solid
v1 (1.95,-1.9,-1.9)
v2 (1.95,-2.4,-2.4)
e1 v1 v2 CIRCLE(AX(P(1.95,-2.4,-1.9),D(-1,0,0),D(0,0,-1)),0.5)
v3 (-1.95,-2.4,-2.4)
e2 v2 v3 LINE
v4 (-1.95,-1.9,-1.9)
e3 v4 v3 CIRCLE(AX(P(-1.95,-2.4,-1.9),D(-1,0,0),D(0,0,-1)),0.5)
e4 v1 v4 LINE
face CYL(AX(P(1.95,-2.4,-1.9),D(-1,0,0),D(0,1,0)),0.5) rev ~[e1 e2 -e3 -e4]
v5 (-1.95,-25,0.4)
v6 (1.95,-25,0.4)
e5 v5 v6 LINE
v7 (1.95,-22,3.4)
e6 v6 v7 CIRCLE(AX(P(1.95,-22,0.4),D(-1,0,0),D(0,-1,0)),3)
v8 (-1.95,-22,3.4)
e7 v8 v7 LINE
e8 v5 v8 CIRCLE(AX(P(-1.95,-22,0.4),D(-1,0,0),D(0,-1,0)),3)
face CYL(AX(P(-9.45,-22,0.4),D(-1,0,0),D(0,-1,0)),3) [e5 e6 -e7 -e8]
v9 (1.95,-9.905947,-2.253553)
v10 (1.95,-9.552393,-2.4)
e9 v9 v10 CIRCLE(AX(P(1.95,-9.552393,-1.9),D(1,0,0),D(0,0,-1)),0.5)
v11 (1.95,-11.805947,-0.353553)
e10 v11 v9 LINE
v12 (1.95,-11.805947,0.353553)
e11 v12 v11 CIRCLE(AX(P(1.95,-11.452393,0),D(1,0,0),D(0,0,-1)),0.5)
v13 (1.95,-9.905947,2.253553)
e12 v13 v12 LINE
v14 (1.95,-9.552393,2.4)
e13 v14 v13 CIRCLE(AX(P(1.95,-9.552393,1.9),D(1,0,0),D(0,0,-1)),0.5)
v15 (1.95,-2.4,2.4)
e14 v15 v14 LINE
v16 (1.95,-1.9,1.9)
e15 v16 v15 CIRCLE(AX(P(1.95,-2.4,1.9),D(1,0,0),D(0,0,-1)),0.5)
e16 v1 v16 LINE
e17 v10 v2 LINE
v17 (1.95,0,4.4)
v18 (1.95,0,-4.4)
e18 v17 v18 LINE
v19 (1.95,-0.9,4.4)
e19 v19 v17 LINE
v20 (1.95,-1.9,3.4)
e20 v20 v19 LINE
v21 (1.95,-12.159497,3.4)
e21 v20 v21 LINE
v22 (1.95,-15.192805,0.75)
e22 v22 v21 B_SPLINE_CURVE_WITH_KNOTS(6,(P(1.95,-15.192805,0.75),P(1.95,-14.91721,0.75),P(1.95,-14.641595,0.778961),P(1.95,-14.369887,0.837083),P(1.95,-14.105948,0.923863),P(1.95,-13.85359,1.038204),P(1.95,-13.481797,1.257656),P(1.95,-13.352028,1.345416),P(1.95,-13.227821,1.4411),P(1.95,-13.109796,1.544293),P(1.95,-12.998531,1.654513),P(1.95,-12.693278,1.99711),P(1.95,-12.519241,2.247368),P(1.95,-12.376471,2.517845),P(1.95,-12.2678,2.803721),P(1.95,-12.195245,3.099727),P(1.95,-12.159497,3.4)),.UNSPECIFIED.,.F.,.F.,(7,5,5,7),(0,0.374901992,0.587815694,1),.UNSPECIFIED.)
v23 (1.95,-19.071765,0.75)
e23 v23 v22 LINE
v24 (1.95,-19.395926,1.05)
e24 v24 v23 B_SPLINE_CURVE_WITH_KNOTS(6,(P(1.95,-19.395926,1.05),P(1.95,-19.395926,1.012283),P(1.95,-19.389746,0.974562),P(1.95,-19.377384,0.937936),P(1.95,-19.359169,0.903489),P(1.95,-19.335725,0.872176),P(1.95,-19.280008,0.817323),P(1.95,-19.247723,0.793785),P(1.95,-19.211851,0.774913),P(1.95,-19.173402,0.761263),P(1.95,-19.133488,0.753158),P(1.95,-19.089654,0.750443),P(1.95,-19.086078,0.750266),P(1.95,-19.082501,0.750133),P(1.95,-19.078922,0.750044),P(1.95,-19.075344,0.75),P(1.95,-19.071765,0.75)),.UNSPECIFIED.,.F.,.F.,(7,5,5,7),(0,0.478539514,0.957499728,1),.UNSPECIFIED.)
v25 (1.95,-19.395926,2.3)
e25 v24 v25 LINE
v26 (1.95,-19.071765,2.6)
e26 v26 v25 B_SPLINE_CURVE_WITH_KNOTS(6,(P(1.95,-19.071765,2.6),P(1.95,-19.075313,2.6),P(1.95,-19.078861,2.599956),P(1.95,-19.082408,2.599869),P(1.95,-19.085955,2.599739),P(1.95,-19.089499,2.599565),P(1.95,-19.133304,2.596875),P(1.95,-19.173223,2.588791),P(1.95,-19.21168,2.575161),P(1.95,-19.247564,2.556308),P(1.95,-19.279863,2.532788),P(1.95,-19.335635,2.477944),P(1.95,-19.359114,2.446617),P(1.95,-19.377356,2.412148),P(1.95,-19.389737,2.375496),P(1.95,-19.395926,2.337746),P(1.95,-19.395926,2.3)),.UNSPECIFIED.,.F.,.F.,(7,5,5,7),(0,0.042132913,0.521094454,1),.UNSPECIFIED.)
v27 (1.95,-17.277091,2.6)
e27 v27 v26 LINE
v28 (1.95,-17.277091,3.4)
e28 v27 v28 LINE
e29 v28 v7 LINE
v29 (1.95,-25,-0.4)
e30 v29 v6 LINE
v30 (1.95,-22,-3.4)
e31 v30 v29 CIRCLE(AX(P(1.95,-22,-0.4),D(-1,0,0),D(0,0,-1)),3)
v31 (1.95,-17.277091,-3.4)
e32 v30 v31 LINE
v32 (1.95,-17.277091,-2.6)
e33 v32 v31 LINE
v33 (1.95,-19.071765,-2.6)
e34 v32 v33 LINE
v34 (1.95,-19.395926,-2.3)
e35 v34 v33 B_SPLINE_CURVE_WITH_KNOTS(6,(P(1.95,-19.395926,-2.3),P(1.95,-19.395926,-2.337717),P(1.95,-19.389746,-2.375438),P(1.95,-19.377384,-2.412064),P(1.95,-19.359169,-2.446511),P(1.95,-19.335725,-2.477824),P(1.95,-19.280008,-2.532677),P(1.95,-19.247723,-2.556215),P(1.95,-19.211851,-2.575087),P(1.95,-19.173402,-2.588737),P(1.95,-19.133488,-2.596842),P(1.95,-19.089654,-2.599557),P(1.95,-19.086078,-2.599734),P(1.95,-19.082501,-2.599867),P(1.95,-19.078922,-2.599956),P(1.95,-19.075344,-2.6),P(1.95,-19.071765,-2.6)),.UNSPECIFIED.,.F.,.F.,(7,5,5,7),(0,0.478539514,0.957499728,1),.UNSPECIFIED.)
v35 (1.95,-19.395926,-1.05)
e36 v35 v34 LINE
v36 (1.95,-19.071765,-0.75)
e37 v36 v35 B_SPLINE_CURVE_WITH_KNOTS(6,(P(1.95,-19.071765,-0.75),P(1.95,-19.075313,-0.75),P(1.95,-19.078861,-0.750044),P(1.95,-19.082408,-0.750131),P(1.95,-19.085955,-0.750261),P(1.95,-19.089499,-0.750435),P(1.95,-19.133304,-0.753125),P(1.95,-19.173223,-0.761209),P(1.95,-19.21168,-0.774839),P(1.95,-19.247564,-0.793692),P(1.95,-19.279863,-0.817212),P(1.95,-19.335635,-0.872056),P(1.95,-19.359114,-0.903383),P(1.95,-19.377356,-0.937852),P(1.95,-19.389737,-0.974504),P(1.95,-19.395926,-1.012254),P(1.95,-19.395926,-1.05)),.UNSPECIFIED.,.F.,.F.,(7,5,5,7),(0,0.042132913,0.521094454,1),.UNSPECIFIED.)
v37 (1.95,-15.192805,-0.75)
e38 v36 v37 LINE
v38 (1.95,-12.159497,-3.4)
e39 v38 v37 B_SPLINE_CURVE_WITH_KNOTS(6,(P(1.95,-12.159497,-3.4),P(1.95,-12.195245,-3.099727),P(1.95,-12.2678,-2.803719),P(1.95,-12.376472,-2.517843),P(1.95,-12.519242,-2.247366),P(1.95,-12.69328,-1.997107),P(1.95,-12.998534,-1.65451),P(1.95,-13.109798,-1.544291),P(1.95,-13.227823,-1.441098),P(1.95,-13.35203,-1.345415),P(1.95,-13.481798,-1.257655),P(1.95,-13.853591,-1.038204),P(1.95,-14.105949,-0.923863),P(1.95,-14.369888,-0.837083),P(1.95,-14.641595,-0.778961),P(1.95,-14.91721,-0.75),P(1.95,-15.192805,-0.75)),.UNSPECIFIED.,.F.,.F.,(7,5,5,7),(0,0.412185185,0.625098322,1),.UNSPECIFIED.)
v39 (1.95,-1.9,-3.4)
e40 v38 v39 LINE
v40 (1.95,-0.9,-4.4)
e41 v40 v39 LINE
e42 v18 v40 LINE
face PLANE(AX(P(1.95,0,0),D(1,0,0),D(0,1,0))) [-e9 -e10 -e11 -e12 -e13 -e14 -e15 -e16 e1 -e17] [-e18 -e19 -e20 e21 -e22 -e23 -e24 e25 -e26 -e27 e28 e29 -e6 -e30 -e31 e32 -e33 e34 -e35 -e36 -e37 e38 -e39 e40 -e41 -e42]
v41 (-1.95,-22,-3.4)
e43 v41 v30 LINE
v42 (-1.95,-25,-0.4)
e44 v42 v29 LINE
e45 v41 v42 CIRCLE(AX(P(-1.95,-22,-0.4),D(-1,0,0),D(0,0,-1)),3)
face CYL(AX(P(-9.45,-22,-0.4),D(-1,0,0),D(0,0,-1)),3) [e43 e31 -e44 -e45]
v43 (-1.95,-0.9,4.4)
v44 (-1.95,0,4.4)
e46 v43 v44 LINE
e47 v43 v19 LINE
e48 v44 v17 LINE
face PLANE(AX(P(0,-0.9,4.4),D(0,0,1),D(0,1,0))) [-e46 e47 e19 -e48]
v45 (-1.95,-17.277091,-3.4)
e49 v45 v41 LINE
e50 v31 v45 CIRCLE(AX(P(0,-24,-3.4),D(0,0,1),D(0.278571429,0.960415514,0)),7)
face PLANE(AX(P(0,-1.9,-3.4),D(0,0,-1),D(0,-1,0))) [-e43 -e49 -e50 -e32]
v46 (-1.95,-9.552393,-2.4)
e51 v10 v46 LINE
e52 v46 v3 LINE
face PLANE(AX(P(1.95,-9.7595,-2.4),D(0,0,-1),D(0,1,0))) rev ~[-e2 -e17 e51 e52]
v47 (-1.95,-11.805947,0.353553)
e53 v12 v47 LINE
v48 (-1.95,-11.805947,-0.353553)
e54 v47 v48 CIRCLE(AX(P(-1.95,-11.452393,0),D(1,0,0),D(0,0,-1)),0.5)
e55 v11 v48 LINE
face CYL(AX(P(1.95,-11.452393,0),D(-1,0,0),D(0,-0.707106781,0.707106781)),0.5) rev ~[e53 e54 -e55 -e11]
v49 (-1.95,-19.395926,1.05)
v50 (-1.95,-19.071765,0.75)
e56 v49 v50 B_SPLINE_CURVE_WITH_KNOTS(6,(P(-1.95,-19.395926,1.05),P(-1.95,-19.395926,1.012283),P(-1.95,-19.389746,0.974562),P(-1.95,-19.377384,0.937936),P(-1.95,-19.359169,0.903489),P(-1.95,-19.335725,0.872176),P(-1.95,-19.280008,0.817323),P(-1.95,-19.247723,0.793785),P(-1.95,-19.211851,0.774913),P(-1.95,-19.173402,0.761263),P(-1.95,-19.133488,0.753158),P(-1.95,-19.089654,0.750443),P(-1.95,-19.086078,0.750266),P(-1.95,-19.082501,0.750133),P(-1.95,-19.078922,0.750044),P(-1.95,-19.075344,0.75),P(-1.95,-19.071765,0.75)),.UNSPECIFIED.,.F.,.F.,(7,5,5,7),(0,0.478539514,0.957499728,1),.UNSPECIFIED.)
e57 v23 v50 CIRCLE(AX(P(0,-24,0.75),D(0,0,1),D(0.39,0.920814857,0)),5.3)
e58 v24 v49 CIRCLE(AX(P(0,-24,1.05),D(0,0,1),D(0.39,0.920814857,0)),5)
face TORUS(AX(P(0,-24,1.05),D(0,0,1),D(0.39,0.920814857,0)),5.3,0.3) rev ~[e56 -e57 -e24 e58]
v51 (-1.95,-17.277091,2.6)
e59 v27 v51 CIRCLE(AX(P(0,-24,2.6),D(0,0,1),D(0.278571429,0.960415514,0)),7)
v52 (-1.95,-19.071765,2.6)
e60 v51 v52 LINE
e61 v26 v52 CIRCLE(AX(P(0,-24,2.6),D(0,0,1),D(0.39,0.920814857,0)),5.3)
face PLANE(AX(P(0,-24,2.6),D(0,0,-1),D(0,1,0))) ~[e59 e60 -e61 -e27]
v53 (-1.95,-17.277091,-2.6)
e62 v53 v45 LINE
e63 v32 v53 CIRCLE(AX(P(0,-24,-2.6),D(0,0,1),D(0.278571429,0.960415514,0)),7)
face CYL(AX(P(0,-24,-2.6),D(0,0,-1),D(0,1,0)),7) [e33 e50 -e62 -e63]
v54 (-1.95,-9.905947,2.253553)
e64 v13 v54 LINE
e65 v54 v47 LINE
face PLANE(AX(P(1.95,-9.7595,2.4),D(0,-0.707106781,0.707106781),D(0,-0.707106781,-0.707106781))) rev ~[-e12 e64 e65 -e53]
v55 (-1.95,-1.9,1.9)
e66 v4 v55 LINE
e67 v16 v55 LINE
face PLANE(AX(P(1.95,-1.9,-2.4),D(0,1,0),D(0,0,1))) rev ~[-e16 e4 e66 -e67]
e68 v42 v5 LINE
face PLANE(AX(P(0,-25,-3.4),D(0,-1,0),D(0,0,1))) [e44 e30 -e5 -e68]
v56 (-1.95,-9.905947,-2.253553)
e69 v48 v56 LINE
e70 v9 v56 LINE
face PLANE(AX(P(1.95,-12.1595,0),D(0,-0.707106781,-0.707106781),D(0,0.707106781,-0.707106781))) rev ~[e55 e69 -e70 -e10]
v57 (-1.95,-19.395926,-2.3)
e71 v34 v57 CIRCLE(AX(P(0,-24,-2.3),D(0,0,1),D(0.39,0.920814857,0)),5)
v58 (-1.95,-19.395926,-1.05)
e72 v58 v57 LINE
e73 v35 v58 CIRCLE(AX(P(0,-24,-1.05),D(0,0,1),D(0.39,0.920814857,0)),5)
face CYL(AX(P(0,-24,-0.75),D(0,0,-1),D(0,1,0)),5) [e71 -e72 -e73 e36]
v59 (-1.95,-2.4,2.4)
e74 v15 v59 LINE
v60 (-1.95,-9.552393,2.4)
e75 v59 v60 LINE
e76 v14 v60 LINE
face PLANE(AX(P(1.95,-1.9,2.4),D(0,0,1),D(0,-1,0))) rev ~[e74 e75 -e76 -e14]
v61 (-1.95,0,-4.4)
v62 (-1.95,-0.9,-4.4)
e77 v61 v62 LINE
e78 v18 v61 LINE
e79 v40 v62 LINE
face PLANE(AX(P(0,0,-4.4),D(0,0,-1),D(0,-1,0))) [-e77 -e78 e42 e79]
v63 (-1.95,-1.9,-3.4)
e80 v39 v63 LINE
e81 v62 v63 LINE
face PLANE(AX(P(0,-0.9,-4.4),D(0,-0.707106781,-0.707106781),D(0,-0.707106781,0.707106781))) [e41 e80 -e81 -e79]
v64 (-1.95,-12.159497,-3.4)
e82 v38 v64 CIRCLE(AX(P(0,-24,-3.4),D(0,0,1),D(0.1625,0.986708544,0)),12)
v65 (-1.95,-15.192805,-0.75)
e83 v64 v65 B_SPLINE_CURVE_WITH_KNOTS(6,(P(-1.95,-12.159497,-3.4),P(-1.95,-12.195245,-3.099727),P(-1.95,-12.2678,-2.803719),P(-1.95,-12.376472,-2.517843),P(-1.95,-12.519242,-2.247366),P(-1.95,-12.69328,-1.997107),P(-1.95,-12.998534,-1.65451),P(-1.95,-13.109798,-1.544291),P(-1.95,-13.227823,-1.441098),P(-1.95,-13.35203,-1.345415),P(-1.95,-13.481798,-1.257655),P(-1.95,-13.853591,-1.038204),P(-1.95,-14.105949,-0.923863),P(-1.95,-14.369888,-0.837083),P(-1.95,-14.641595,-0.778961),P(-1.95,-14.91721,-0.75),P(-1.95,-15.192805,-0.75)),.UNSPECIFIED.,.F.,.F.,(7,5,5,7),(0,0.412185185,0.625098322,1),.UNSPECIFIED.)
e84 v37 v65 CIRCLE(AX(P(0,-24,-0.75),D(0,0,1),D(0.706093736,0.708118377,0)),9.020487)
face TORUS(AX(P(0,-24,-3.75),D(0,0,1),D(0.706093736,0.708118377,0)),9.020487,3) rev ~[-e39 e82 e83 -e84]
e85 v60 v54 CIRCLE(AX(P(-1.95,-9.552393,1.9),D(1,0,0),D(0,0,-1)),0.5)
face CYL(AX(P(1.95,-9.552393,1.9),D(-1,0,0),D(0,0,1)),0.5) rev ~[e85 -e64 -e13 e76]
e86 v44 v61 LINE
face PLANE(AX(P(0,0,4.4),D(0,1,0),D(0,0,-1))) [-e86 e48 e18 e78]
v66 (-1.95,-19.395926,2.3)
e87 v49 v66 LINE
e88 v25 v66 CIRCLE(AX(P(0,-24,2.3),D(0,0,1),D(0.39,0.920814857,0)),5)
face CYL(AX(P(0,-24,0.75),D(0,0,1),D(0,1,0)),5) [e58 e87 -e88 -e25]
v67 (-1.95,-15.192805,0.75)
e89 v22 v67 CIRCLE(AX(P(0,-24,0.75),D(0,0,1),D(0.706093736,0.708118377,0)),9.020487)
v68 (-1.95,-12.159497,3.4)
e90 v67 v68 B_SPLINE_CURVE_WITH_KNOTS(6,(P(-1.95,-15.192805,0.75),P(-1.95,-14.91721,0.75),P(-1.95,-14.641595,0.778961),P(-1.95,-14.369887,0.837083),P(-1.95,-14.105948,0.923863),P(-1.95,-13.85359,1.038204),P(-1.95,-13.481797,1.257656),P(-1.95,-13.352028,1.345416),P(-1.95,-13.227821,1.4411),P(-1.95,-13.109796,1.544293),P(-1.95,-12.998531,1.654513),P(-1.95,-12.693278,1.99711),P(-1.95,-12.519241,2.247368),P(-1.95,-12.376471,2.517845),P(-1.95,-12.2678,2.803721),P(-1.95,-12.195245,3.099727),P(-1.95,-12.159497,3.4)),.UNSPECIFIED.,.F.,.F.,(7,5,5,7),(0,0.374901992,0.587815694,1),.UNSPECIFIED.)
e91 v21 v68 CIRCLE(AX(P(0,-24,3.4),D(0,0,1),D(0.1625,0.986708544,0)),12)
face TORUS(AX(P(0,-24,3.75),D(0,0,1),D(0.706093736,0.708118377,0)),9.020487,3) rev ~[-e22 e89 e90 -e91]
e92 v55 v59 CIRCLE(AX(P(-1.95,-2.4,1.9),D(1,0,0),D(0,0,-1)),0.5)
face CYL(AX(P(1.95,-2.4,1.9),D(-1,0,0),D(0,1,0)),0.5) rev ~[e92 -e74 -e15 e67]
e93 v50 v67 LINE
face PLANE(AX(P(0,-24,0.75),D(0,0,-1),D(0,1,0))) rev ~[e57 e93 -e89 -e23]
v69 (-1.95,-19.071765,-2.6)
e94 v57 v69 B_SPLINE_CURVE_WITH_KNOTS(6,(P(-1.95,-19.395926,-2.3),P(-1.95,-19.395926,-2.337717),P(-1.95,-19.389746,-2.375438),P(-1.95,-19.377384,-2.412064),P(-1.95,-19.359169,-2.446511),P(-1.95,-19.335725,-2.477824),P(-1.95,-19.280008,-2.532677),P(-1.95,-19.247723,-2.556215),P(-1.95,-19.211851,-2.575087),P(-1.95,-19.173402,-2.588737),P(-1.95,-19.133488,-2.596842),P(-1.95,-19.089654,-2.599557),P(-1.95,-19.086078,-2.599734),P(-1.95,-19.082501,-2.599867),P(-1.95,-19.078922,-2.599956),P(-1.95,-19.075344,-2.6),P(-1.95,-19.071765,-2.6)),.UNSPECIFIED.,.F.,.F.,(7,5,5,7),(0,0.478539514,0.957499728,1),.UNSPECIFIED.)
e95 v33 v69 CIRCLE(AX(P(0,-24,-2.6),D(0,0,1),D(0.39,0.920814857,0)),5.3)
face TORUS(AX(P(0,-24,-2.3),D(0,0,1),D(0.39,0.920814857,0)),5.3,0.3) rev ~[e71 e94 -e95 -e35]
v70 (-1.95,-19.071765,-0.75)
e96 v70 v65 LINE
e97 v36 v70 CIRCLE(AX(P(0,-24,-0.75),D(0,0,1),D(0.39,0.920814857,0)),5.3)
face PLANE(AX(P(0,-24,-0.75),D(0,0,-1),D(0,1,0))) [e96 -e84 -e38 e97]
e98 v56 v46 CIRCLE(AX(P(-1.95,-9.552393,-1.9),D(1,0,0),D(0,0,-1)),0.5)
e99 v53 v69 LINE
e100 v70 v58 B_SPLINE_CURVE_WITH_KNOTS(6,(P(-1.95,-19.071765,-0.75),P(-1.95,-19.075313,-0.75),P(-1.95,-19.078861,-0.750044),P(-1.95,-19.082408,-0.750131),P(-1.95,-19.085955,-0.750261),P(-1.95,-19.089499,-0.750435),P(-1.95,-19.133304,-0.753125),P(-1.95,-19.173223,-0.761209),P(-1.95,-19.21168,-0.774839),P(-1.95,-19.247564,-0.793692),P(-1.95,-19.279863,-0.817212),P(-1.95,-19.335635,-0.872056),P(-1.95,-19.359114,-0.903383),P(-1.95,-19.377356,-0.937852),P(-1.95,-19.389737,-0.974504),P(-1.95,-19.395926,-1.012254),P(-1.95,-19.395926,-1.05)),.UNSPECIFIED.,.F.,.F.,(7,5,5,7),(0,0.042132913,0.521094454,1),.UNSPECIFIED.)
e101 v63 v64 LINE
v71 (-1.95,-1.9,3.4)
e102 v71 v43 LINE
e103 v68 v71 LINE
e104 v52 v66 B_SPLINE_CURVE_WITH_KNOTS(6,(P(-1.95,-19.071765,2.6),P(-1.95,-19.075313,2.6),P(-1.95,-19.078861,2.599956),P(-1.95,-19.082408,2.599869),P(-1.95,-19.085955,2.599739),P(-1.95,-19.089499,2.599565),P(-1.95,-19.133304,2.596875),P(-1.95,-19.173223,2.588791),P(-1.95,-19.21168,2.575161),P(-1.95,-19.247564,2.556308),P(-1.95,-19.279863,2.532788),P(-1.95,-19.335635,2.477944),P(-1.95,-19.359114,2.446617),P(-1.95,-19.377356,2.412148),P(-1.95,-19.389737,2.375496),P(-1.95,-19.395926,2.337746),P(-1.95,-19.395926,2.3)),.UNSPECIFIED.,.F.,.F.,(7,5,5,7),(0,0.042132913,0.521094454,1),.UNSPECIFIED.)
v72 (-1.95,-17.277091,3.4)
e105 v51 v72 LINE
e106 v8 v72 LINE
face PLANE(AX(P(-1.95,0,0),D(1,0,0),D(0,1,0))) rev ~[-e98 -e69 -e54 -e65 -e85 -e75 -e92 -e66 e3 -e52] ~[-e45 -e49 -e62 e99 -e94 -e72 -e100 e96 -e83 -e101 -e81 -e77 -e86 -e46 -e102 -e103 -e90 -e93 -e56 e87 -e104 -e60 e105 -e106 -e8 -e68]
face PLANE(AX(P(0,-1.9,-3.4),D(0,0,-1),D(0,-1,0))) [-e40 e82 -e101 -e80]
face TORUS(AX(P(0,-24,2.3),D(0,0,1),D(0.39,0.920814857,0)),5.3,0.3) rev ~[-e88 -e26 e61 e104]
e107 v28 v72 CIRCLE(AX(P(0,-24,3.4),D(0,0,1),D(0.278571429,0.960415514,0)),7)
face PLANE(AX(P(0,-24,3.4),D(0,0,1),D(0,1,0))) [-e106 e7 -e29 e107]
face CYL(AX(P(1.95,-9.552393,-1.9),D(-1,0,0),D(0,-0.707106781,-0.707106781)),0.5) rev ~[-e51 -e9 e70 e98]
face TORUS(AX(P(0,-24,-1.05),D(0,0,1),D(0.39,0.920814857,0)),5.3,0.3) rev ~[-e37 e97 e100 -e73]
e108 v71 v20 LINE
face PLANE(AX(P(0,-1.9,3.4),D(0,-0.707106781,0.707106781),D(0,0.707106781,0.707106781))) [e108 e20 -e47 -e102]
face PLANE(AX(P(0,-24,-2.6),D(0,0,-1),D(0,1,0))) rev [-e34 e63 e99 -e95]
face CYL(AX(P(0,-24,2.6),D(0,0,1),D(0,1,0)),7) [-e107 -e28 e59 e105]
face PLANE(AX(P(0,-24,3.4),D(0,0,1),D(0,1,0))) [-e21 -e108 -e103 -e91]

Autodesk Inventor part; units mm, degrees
ref_plane "YZ Plane" through (0, 0, 0) normal (1, 0, 0) x (0, 1, 0)
ref_plane "XZ Plane" through (0, 0, 0) normal (0, 1, 0) x (-1, 0, 0)
ref_plane "XY Plane" through (0, 0, 0) normal (0, 0, 1) x (1, 0, 0)
sketch "Sketch1" plane through (0, 0, 0) normal (1, 0, 0) x (0, 1, 0)
  line L0 (0, 4.4) -> (0, -4.4)
  line L1 (0, -4.4) -> (-0.9, -4.4)
  line L2 (-0.9, -4.4) -> (-1.9, -3.4)
  line L3 (-1.9, -3.4) -> (-1.9, -3.4)
  line L4 (-1.9, -3.4) -> (-25, -3.4)
  line L5 (-25, -3.4) -> (-25, 3.4)
  line L6 (-25, 3.4) -> (-1.9, 3.4)
  line L7 (-1.9, 3.4) -> (-1.9, 3.4)
  line L8 (-1.9, 3.4) -> (-0.9, 4.4)
  line L9 (-0.9, 4.4) -> (0, 4.4)
  line L10 (0, 0) -> (-25, 0) construction
  line L11 (-24, 3.4) -> (-24, -3.4)
  line L12 (-12, 3.4) -> (-12, 0.75)
  line L13 (-12, 0.75) -> (-19, 0.75)
  line L14 (-19, 0.75) -> (-19, 2.6)
  line L15 (-19, 2.6) -> (-17, 2.6)
  line L16 (-17, 2.6) -> (-17, 3.4)
  line L17 (-12, -3.4) -> (-12, -0.75)
  line L18 (-12, -0.75) -> (-19, -0.75)
  line L19 (-19, -0.75) -> (-19, -2.6)
  line L20 (-19, -2.6) -> (-17, -2.6)
  line L21 (-17, -2.6) -> (-17, -3.4)
  dimension "d0" = 8.8
  dimension "d1" = 1.9
  dimension "d2" = 135
  dimension "d5" = 0.9
  dimension "d6" = 25
  dimension "d7" = 6.8
  dimension "d9" = 14
  dimension "d10" = 1
  dimension "d11" = 0.8
  dimension "d13" = 5
  dimension "d16" = 10
  dimension "d24" = 1.5
extrude "Extrusion1" add sketch "Sketch1" along normal mid plane 3.9
revolve "Revolution1" cut sketch "Sketch1" angle 360 about axis through (0, -24, 3.4) along (0, 0, -1) contours L12 L13 L14 L15 L16 L6 | L4 L21 L20 L19 L18 L17
fillet "Fillet1" radius 3 4 edges at (0, -12, 0.75) (0, -12, -0.75) (0, -25, -3.4) (0, -25, 3.4)
fillet "Fillet2" radius 0.3 4 edges at (0, -19, 2.6) (0, -19, 0.75) (0, -19, -0.75) (0, -19, -2.6)
sketch "Sketch2" plane through (1.95, 0, 0) normal (1, 0, 0) x (0, 0, -1)
  line L0 (-2.4, -1.9) -> (-2.4, -9.7595)
  line L1 (-2.4, -9.7595) -> (0, -12.1595)
  line L2 (0, -12.1595) -> (2.4, -9.7595)
  line L3 (2.4, -9.7595) -> (2.4, -1.9)
  line L4 (2.4, -1.9) -> (-2.4, -1.9)
  line L5 (-3.4, -1.9) -> (-3.4, -22) projected
  line L6 (0, 0) -> (0, -12.1595) construction
  line L7 (4.4, 0) -> (-4.4, 0) projected
  point P0 (-3.4, -12.1595)
  dimension "d19" = 1
  dimension "d20" = 135
extrude "Extrusion2" cut sketch "Sketch2" against normal through all
fillet "Fillet3" radius 0.5 5 edges at (0, -9.7595, 2.4) (0, -12.1595, 0) (0, -9.7595, -2.4) (0, -1.9, 2.4) (0, -1.9, -2.4)
properties part number "FS-04-SLBV1"
